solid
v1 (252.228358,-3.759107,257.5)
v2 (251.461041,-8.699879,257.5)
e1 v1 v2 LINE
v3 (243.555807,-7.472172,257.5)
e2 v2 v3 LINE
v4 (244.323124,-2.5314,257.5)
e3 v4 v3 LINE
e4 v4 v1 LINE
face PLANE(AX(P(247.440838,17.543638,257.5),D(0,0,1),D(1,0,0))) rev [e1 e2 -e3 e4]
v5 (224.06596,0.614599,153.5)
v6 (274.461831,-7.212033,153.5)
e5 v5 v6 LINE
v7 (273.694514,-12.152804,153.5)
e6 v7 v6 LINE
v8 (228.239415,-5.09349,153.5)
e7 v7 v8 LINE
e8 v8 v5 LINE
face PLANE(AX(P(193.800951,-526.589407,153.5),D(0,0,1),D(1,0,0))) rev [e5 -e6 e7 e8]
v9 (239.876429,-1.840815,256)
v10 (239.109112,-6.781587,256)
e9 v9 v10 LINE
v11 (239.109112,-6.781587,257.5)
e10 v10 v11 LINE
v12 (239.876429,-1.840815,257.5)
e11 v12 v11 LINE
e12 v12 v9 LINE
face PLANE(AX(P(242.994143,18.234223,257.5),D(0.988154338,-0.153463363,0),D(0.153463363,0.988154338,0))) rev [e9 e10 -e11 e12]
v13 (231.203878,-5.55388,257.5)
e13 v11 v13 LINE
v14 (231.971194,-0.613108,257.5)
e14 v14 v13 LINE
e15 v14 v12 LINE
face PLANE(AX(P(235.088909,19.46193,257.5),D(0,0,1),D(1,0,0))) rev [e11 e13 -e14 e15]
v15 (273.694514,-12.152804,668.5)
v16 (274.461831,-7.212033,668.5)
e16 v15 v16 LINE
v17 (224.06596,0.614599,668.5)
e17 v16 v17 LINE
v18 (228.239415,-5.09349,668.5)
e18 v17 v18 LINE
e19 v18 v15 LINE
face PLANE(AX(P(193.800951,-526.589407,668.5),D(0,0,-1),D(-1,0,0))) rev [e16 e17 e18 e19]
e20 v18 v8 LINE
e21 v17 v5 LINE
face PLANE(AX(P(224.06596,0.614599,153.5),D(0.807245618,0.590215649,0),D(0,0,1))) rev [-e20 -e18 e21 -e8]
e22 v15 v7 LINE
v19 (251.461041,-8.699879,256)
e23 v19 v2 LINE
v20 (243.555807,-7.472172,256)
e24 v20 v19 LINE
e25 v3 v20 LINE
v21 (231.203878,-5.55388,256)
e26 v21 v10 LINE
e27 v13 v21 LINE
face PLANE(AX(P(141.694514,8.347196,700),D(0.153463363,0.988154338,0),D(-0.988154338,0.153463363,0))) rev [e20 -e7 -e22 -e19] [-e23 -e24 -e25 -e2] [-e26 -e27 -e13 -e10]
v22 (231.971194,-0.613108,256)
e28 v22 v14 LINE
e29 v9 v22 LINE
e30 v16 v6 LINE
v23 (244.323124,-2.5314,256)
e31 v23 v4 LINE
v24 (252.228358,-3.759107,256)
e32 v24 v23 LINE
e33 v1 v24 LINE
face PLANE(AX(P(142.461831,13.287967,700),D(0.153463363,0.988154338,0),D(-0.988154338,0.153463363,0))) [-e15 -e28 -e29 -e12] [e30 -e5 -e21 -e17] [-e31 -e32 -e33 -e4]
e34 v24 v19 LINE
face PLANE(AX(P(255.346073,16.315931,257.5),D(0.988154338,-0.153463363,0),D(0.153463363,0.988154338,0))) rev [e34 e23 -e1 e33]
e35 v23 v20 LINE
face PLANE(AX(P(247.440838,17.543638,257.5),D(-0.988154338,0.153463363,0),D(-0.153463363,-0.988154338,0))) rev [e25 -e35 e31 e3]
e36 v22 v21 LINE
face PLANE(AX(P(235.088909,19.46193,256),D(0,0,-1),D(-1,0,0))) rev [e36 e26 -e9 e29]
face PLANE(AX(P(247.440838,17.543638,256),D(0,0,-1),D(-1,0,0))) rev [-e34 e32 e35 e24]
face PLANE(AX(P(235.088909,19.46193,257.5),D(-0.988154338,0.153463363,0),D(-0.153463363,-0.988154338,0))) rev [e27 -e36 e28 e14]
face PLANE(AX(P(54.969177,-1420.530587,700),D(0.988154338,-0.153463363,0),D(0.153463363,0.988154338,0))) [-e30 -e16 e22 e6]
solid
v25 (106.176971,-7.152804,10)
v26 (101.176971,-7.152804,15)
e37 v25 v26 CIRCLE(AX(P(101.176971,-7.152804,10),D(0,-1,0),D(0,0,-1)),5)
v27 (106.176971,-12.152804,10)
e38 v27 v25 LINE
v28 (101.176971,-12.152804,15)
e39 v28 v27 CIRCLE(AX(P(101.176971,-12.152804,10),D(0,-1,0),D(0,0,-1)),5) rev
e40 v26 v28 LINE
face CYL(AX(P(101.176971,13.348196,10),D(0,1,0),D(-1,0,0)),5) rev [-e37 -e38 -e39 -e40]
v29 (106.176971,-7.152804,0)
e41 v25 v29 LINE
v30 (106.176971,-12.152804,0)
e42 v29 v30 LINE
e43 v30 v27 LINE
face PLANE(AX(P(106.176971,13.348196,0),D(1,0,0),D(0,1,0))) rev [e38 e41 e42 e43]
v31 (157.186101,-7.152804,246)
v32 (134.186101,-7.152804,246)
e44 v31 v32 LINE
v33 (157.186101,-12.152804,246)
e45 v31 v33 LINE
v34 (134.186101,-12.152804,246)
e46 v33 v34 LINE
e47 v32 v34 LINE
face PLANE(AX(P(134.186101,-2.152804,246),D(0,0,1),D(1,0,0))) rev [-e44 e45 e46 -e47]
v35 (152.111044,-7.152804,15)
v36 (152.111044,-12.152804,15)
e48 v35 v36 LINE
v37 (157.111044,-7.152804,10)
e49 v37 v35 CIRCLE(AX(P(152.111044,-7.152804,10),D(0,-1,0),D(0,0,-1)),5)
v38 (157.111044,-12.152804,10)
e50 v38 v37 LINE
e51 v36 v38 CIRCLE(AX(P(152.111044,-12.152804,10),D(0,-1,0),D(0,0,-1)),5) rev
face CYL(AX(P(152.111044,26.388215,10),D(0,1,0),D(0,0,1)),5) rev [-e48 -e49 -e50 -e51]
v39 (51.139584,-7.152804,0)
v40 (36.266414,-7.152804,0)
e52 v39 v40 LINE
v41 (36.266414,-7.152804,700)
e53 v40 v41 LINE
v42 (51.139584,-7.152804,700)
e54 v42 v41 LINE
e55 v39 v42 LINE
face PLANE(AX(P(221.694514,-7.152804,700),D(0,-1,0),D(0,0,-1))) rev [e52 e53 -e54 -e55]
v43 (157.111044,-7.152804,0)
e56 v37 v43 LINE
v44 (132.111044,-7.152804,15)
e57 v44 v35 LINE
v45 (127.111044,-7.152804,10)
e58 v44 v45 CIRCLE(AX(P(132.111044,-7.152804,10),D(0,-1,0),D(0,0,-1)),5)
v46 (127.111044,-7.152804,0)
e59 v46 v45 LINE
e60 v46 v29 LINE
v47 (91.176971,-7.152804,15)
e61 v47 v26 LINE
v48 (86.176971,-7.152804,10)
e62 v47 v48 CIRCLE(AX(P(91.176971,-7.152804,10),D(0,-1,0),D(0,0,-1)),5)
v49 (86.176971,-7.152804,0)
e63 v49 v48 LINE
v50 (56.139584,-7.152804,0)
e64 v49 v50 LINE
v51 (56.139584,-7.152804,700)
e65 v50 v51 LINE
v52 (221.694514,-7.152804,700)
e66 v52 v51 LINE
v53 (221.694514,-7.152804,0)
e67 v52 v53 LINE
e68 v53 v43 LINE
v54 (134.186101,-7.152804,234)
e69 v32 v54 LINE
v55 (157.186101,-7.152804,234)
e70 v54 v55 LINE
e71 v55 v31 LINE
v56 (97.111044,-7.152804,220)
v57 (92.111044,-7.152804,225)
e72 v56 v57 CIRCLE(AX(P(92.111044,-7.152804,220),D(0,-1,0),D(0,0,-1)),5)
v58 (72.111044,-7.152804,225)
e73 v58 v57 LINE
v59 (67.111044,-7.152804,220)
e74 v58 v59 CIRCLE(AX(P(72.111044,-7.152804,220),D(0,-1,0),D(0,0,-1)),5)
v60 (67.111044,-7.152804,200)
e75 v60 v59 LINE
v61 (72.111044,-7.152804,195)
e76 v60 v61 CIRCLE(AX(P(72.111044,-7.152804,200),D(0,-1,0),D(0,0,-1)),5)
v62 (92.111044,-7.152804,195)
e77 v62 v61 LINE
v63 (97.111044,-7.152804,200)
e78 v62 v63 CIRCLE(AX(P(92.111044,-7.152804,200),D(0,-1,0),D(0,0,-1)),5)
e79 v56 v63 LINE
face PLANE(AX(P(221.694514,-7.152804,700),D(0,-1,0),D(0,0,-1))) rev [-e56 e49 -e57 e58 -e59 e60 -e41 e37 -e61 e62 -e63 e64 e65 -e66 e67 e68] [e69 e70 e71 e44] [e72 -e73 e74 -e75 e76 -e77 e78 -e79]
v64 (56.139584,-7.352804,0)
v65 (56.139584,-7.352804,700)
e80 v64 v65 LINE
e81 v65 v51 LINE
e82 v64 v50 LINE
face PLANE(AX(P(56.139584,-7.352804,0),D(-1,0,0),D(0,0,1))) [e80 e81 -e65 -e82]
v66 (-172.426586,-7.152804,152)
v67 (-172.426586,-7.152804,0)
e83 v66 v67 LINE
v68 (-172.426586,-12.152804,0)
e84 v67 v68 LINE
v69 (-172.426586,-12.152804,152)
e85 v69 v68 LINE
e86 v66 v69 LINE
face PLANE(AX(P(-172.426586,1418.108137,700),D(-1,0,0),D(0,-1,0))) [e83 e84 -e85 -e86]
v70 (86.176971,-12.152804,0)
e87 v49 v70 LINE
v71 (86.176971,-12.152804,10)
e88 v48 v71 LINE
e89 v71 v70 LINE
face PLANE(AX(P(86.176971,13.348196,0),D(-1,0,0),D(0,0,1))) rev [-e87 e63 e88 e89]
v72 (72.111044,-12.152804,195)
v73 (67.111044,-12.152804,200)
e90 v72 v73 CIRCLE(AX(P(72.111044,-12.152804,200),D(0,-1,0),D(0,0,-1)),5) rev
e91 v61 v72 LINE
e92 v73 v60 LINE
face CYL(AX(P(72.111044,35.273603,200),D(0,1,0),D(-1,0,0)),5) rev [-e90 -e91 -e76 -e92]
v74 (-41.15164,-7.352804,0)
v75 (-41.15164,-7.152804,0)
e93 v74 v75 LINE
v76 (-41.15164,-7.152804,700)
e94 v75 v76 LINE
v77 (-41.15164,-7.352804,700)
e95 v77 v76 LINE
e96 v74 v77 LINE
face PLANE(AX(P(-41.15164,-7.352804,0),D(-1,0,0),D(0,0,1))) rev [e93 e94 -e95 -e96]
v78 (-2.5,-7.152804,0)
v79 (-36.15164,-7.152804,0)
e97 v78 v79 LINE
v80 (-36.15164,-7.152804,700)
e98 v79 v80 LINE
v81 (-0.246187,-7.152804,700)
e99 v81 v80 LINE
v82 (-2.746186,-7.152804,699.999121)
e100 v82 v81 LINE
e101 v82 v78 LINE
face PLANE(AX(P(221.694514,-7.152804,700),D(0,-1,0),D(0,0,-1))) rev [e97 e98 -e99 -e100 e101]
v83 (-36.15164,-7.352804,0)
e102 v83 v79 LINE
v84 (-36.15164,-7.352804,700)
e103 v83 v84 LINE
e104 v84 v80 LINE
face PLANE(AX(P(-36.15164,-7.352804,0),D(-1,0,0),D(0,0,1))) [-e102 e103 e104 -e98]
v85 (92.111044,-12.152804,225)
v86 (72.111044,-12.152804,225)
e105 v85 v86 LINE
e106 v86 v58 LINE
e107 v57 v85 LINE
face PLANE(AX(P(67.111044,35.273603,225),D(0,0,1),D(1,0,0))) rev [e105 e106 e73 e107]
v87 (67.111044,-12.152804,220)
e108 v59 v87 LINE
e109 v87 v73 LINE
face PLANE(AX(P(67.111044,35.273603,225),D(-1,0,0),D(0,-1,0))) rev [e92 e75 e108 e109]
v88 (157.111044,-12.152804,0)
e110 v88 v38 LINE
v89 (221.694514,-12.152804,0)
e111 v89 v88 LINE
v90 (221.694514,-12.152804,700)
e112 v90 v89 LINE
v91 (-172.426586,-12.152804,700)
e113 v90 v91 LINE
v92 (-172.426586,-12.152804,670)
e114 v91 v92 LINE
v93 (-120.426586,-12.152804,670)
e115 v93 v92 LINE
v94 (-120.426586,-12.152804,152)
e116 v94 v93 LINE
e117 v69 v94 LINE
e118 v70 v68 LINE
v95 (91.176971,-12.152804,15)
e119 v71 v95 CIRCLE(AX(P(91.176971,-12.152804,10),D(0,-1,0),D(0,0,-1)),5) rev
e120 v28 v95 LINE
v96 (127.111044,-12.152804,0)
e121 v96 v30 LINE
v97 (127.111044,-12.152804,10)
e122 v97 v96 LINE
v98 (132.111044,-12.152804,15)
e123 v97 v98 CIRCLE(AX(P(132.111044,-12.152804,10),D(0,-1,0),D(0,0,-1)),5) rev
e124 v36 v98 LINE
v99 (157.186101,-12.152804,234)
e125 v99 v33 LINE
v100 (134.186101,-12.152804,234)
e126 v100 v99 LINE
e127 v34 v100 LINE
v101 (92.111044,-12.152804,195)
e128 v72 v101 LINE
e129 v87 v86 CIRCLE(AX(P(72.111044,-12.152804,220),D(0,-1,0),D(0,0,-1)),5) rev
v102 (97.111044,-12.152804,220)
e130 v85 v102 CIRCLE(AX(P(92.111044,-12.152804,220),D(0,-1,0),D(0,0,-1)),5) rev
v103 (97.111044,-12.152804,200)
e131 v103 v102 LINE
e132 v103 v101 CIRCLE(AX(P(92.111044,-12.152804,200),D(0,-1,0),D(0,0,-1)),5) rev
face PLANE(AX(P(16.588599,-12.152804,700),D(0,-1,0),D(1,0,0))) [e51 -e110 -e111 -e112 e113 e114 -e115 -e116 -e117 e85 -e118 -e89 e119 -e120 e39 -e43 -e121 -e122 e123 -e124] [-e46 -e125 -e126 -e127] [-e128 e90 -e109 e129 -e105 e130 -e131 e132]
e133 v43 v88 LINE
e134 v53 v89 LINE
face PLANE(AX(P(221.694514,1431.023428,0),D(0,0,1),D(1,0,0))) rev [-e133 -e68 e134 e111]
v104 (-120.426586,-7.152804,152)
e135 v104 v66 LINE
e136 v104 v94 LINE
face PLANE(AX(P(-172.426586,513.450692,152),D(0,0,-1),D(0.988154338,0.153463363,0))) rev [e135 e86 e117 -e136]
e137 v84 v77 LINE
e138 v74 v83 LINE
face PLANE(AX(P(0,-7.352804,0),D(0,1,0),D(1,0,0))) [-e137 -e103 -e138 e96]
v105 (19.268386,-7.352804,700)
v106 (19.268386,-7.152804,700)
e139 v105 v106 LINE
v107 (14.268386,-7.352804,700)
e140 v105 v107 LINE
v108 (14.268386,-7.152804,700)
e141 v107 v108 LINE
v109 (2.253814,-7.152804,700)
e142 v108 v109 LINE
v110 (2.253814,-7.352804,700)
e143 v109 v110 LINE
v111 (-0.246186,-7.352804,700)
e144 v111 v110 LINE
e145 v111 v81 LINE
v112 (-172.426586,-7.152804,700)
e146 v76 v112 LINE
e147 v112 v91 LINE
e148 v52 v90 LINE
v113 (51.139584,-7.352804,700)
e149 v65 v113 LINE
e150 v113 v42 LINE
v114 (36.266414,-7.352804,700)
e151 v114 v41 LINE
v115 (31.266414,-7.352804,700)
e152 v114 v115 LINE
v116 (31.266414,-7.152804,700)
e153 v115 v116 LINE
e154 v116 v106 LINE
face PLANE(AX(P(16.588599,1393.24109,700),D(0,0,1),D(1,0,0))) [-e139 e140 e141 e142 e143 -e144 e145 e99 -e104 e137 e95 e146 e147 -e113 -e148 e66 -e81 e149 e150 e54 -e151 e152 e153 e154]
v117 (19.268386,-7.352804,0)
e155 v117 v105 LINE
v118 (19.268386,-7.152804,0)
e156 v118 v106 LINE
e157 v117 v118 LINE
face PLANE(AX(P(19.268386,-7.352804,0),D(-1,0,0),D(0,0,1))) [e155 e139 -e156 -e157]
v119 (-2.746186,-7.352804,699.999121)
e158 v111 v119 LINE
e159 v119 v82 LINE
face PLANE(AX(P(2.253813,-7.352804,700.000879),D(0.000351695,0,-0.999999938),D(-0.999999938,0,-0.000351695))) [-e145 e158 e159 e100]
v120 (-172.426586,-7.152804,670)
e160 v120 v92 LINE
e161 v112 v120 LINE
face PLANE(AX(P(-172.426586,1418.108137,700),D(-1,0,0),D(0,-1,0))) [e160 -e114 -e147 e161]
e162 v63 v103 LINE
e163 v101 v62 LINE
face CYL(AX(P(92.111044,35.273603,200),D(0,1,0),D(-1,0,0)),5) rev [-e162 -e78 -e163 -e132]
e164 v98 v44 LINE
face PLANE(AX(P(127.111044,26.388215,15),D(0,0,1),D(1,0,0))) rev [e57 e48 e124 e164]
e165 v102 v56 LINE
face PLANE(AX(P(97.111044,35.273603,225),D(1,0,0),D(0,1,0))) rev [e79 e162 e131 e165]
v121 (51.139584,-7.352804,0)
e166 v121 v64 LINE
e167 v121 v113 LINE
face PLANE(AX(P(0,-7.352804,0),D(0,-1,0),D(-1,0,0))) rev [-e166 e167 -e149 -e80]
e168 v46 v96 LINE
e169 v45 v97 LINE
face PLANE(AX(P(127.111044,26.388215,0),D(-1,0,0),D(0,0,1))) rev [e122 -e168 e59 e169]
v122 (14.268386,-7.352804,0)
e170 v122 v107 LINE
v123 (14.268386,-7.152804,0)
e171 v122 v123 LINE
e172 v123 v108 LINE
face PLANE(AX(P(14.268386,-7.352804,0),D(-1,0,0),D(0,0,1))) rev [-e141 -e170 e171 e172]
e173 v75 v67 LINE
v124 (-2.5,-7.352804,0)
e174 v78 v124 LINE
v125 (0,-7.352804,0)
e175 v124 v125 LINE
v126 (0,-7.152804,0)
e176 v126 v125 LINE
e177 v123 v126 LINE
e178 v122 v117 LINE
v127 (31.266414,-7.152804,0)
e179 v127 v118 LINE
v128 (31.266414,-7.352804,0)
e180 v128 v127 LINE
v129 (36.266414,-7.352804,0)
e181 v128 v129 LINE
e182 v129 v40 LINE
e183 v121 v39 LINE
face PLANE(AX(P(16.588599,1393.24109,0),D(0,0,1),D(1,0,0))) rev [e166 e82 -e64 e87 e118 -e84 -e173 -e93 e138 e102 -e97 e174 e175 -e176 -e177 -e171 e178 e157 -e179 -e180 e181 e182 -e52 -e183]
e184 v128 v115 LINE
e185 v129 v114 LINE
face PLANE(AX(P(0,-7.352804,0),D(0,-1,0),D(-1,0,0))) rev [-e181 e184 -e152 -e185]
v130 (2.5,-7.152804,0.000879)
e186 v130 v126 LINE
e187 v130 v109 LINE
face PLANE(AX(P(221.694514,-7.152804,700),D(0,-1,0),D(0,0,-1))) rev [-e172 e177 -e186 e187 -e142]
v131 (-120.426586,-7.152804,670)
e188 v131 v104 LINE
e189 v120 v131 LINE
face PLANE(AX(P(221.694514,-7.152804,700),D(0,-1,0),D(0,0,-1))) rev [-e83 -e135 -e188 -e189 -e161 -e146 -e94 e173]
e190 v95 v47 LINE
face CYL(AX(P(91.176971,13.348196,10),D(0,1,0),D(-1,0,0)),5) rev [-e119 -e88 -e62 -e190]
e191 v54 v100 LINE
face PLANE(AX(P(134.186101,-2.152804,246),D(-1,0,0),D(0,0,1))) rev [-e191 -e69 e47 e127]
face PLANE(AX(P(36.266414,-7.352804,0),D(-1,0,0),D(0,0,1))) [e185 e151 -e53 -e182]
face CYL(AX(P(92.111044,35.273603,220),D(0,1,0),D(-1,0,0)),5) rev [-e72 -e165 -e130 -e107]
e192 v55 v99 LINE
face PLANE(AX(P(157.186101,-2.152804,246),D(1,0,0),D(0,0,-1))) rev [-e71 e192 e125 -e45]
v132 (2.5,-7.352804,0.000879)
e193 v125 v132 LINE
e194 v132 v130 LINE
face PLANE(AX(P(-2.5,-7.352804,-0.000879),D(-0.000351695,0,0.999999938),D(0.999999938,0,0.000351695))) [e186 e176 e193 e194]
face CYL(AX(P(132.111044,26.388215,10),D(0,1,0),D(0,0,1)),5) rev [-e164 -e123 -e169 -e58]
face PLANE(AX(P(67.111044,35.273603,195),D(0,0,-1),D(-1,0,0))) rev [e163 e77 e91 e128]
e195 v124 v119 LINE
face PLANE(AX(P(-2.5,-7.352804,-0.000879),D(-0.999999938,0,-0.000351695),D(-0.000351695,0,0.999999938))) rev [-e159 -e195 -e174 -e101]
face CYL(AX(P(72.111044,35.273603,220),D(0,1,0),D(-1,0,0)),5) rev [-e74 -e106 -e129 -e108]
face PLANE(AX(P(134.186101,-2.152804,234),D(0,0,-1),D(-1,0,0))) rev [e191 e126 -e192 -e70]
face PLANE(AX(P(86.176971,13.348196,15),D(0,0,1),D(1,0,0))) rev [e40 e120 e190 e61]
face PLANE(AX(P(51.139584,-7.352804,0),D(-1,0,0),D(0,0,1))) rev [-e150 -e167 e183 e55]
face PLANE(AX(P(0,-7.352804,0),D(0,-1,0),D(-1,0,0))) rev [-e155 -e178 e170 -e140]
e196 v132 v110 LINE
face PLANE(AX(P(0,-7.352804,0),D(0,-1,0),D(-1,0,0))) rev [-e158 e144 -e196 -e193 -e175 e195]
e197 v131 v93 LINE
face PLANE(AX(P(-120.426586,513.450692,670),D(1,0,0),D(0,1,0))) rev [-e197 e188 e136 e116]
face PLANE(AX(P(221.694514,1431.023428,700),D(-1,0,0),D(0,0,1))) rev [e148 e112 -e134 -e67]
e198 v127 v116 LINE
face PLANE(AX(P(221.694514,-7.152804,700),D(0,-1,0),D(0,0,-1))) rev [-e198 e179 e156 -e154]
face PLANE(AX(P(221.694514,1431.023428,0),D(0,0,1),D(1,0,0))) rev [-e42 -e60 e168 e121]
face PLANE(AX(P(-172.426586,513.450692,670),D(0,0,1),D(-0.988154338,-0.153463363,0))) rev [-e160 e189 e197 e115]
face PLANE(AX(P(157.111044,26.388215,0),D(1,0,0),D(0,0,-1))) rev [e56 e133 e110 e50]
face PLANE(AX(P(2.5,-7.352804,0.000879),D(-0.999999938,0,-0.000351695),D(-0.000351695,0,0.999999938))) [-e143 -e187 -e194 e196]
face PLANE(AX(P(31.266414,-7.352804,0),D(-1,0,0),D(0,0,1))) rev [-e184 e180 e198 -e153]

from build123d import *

# Parameters (mm, degrees)
TRAGFL_CHEGRUNDFORM_DEPTH                    = 700
ABWICKELN1_DEPTH                             = 700
ABWICKELN1_2_DEPTH                           = 700
ABBIEGEN1_DEPTH                              = 700
ABBIEGEN1_2_DEPTH                            = 700
QUERRUDER_DEPTH                              = 5
FASE1_SIZE                                   = 5
SKIZZE9_W                                    = 20
SKIZZE9_H                                    = 15
KABELDURCHBRUCHRUMPF_DEPTH                   = 5
VERRUNDUNG1_R                                = 5
SKIZZE10_W                                   = 30
SKIZZE10_H                                   = 30
KABELDURCHBRUCHMOTOR_DEPTH                   = 5
VERRUNDUNG2_R                                = 5
SKIZZE11_W                                   = 30
SKIZZE11_H                                   = 15
SCHNITT_LINEAR_AUSTRAGEN1_DEPTH              = 5
KABELDURCHBURCHSERVOS_R                      = 5
SKIZZE12_W                                   = 23
SKIZZE12_H                                   = 12
SERVODURCHBRUCH_DEPTH                        = 10
SKIZZE13_W                                   = 8
SKIZZE13_H                                   = 1.5
SCHNITT_LINEAR_AUSTRAGEN2_DEPTH              = 752.378951978
SCHNITT_LINEAR_AUSTRAGEN_D_NN2_DEPTH         = 700
SCHNITT_LINEAR_AUSTRAGEN_D_NN2_2_OUTLINE_W   = 52
SCHNITT_LINEAR_AUSTRAGEN_D_NN2_2_OUTLINE_H   = 5
SCHNITT_LINEAR_AUSTRAGEN_D_NN2_2_DEPTH       = 152
SCHNITT_LINEAR_AUSTRAGEN_D_NN2_START         = 670
SCHNITT_LINEAR_AUSTRAGEN_D_NN2_3_OUTLINE_W   = 52
SCHNITT_LINEAR_AUSTRAGEN_D_NN2_3_OUTLINE_H   = 5
SCHNITT_LINEAR_AUSTRAGEN_D_NN2_3_DEPTH       = 30
SCHNITT_LINEAR_AUSTRAGEN_D_NN2_4_DEPTH       = 700
SCHNITT_LINEAR_AUSTRAGEN_D_NN2_START_2       = -12.152804342
SCHNITT_LINEAR_AUSTRAGEN_D_NN2_5_OUTLINE_W   = 179.426586231
SCHNITT_LINEAR_AUSTRAGEN_D_NN2_5_OUTLINE_H   = 700
SCHNITT_LINEAR_AUSTRAGEN_D_NN2_5_DEPTH       = 4.8
SCHNITT_LINEAR_AUSTRAGEN_D_NN2_START_3       = -7.352804342
SCHNITT_LINEAR_AUSTRAGEN_D_NN2_6_OUTLINE_W   = 79.274946575
SCHNITT_LINEAR_AUSTRAGEN_D_NN2_6_OUTLINE_H   = 700
SCHNITT_LINEAR_AUSTRAGEN_D_NN2_6_OUTLINE_W_2 = 11.998027887
SCHNITT_LINEAR_AUSTRAGEN_D_NN2_6_OUTLINE_W_3 = 14.873170005
SCHNITT_LINEAR_AUSTRAGEN_D_NN2_6_DEPTH       = 0.2


with BuildPart() as part:
    # TragflächeGrundform: read off the stored shape, not the designer's step
    # TragflächeGrundform outline → TragflächeGrundform (new body)
    with BuildSketch(Plane.XY):
        Polygon((141.694514104, 8.347195658), (273.694514104, -12.152804342), (274.46183092, -7.212032651), (142.080458395, 13.347195658), (103.267684057, 13.347195658), (86.110620432, 10.396432289), (69.585407633, 5.027065166), (35.868015254, -12.152804342), (221.694514104, -12.152804342), (221.694514104, -7.152804342), (56.694514104, -7.152804342), (71.504741461, 0.393383409), (87.313114186, 5.529835073), (103.694514104, 8.347195658), align=None)
    extrude(amount=TRAGFL_CHEGRUNDFORM_DEPTH)

    # Abwickeln1: read off the stored shape, not the designer's step
    # Abwickeln1 outline → Abwickeln1 (cut)
    with BuildSketch(Plane.XY):
        Polygon((69.585407633, 5.027065166), (45.681067781, -7.152804342), (56.694514104, -7.152804342), (71.504741461, 0.393383409), (87.313114186, 5.529835073), (103.694514104, 8.347195658), (141.694514104, 8.347195658), (273.694514104, -12.152804342), (274.46183092, -7.212032651), (142.080458395, 13.347195658), (103.267684057, 13.347195658), (86.110620432, 10.396432289), align=None)
    extrude(amount=ABWICKELN1_DEPTH, mode=Mode.SUBTRACT)

    # Abwickeln1 2 outline → Abwickeln1 2 (add)
    with BuildSketch(Plane.XY):
        Polygon((45.681067781, -7.152804342), (-172.426586231, -7.152804342), (-172.426586231, -12.152804342), (35.868015254, -12.152804342), align=None)
    extrude(amount=ABWICKELN1_2_DEPTH)

    # Abbiegen1: read off the stored shape, not the designer's step
    # Abbiegen1 outline → Abbiegen1 (cut)
    with BuildSketch(Plane.XY):
        with BuildLine():
            ThreePointArc((57.111044081, -12.152804342), (53.540329867, -10.694232633), (52.012024567, -7.152804342))
            Line((52.012024567, -7.152804342), (-172.426586231, -7.152804342))
            Line((-172.426586231, -7.152804342), (-172.426586231, -12.152804342))
            Line((-172.426586231, -12.152804342), (57.111044081, -12.152804342))
        make_face()
    extrude(amount=ABBIEGEN1_DEPTH, mode=Mode.SUBTRACT)

    # Abbiegen1 2 outline → Abbiegen1 2 (add)
    with BuildSketch(Plane.XY):
        with BuildLine():
            Line((141.702141554, 8.346011092), (273.694514104, -12.152804342))
            Line((273.694514104, -12.152804342), (274.46183092, -7.212032651))
            Line((274.46183092, -7.212032651), (142.46945837, 13.286782783))
            ThreePointArc((142.46945837, 13.286782783), (142.079290863, 13.332070009), (141.686795218, 13.347195658))
            Line((141.686795218, 13.347195658), (103.703050705, 13.347195658))
            ThreePointArc((103.703050705, 13.347195658), (103.269261775, 13.328713853), (102.838616847, 13.273402389))
            Line((102.838616847, 13.273402389), (86.472730203, 10.45870986))
            ThreePointArc((86.472730203, 10.45870986), (86.113791213, 10.383599863), (85.76117739, 10.282891362))
            Line((85.76117739, 10.282891362), (69.967141466, 5.151098007))
            ThreePointArc((69.967141466, 5.151098007), (69.591442632, 5.01249539), (69.227776589, 4.844843047))
            Line((69.227776589, 4.844843047), (54.795692532, -2.508671069))
            ThreePointArc((54.795692532, -2.508671069), (52.736662064, -4.430823798), (52.012024567, -7.152804342))
            Line((52.012024567, -7.152804342), (57.111044081, -7.152804342))
            ThreePointArc((57.111044081, -7.152804342), (57.013807089, -7.076148878), (57.065645031, -6.963703689))
            Line((57.065645031, -6.963703689), (71.497729087, 0.389810426))
            ThreePointArc((71.497729087, 0.389810426), (71.504859794, 0.393097727), (71.512226438, 0.395815426))
            Line((71.512226438, 0.395815426), (87.306262362, 5.52760878))
            ThreePointArc((87.306262362, 5.52760878), (87.313176358, 5.529583457), (87.320214378, 5.531056202))
            Line((87.320214378, 5.531056202), (103.686101021, 8.345748731))
            ThreePointArc((103.686101021, 8.345748731), (103.694545039, 8.34683327), (103.703050705, 8.347195658))
            Line((103.703050705, 8.347195658), (141.686795218, 8.347195658))
            ThreePointArc((141.686795218, 8.347195658), (141.694491211, 8.346899077), (141.702141554, 8.346011092))
        make_face()
    extrude(amount=ABBIEGEN1_2_DEPTH)

    # Skizze8 → Querruder (cut)
    with BuildSketch(Plane(origin=(5.370179419, 34.578716257, 0), x_dir=(0.9881543382363094, -0.15346336313518455, 0), z_dir=(0.15346336313518455, 0.9881543382363094, 0))):
        Polygon((272.317431689, -670), (220.317431689, -670), (220.317431689, -418.5), (220.317431689, -358.002851525), (220.317431689, -152), (272.317431689, -152), (272.317431689, -153.5), (221.317431689, -153.5), (221.317431689, -668.5), (272.317431689, -668.5), align=None)
    extrude(amount=-QUERRUDER_DEPTH, mode=Mode.SUBTRACT)


with BuildPart() as querruder_piece_1:
    # of the separate pieces the step leaves, piece 1, a body of its own (querruder_pieces)
    add(part.part.solids().sort_by_distance((221.694514104, -12.152804342, 0))[0])

    # Skizze9 → KabeldurchbruchRumpf (cut)
    with BuildSketch(Plane.XZ.offset(12.152804342)):
        with Locations((96.176970849, 7.5)):
            Rectangle(SKIZZE9_W, SKIZZE9_H)
    extrude(amount=-KABELDURCHBRUCHRUMPF_DEPTH, mode=Mode.SUBTRACT)

    # Verrundung1
    verrundung1_edges = [querruder_piece_1.edges().sort_by_distance(p)[0] for p in [
        (86.176970849, -9.652804342, 15),
        (106.176970849, -9.652804342, 15),
    ]]
    fillet(verrundung1_edges, radius=VERRUNDUNG1_R)

    # Skizze10 → KabeldurchbruchMotor (cut)
    with BuildSketch(Plane.XZ.offset(12.152804342)):
        with Locations((82.111044081, 210)):
            Rectangle(SKIZZE10_W, SKIZZE10_H)
    extrude(amount=-KABELDURCHBRUCHMOTOR_DEPTH, mode=Mode.SUBTRACT)

    # Verrundung2
    verrundung2_edges = [querruder_piece_1.edges().sort_by_distance(p)[0] for p in [
        (67.111044081, -9.652804342, 195),
        (67.111044081, -9.652804342, 225),
        (97.111044081, -9.652804342, 225),
        (97.111044081, -9.652804342, 195),
    ]]
    fillet(verrundung2_edges, radius=VERRUNDUNG2_R)

    # Skizze11 → Schnitt-Linear austragen1 (cut)
    with BuildSketch(Plane.XZ.offset(12.152804342)):
        with Locations((142.111044081, 7.5)):
            Rectangle(SKIZZE11_W, SKIZZE11_H)
    extrude(amount=-SCHNITT_LINEAR_AUSTRAGEN1_DEPTH, mode=Mode.SUBTRACT)

    # KabeldurchburchServos
    kabeldurchburchservos_edges = [querruder_piece_1.edges().sort_by_distance(p)[0] for p in [
        (127.111044081, -9.652804342, 15),
        (157.111044081, -9.652804342, 15),
    ]]
    fillet(kabeldurchburchservos_edges, radius=KABELDURCHBURCHSERVOS_R)

    # Skizze12 → ServoDurchbruch (cut)
    with BuildSketch(Plane.XZ.offset(12.152804342)):
        with Locations((145.686101021, 240)):
            Rectangle(SKIZZE12_W, SKIZZE12_H)
    extrude(amount=-SERVODURCHBRUCH_DEPTH, mode=Mode.SUBTRACT)

    # Schnitt-Linear-Austragen-Dünn2: read off the stored shape, not the designer's step
    # Schnitt-Linear-Austragen-Dünn2 outline → Schnitt-Linear-Austragen-Dünn2 (cut)
    with BuildSketch(Plane.XY):
        Polygon((274.46183092, -7.212032651), (223.077805331, 0.768062232), (222.310488516, -4.172709459), (273.694514104, -12.152804342), align=None)
    extrude(amount=SCHNITT_LINEAR_AUSTRAGEN_D_NN2_DEPTH, mode=Mode.SUBTRACT)

    # Schnitt-Linear-Austragen-D_nn2 2 outline → Schnitt-Linear-Austragen-D_nn2 2 (add)
    with BuildSketch(Plane.XY):
        with Locations((-146.426586231, -9.652804342)):
            Rectangle(SCHNITT_LINEAR_AUSTRAGEN_D_NN2_2_OUTLINE_W, SCHNITT_LINEAR_AUSTRAGEN_D_NN2_2_OUTLINE_H)
    extrude(amount=SCHNITT_LINEAR_AUSTRAGEN_D_NN2_2_DEPTH)

    # Schnitt-Linear-Austragen-D_nn2 3 outline → Schnitt-Linear-Austragen-D_nn2 3 (add)
    with BuildSketch(Plane.XY.offset(SCHNITT_LINEAR_AUSTRAGEN_D_NN2_START)):
        with Locations((-146.426586231, -9.652804342)):
            Rectangle(SCHNITT_LINEAR_AUSTRAGEN_D_NN2_3_OUTLINE_W, SCHNITT_LINEAR_AUSTRAGEN_D_NN2_3_OUTLINE_H)
    extrude(amount=SCHNITT_LINEAR_AUSTRAGEN_D_NN2_3_DEPTH)

    # Schnitt-Linear-Austragen-D_nn2 4 outline → Schnitt-Linear-Austragen-D_nn2 4 (cut)
    with BuildSketch(Plane.XY):
        with BuildLine():
            ThreePointArc((54.795692532, -2.508671069), (52.686053369, -4.517166908), (52.019875256, -7.352804342))
            Line((52.019875256, -7.352804342), (56.139584199, -7.352804342))
            Line((56.139584199, -7.352804342), (56.139584199, -7.152804342))
            Line((56.139584199, -7.152804342), (57.111044081, -7.152804342))
            ThreePointArc((57.111044081, -7.152804342), (57.013807089, -7.076148878), (57.065645031, -6.963703689))
            Line((57.065645031, -6.963703689), (71.497729087, 0.389810426))
            ThreePointArc((71.497729087, 0.389810426), (71.504859794, 0.393097727), (71.512226438, 0.395815426))
            Line((71.512226438, 0.395815426), (87.306262362, 5.52760878))
            ThreePointArc((87.306262362, 5.52760878), (87.313176358, 5.529583457), (87.320214378, 5.531056202))
            Line((87.320214378, 5.531056202), (103.686101021, 8.345748731))
            ThreePointArc((103.686101021, 8.345748731), (103.694545039, 8.34683327), (103.703050705, 8.347195658))
            Line((103.703050705, 8.347195658), (141.686795218, 8.347195658))
            ThreePointArc((141.686795218, 8.347195658), (141.694491211, 8.346899077), (141.702141554, 8.346011092))
            Line((141.702141554, 8.346011092), (222.310488516, -4.172709459))
            Line((222.310488516, -4.172709459), (223.077805331, 0.768062232))
            Line((223.077805331, 0.768062232), (142.46945837, 13.286782783))
            ThreePointArc((142.46945837, 13.286782783), (142.079290863, 13.332070009), (141.686795218, 13.347195658))
            Line((141.686795218, 13.347195658), (103.703050705, 13.347195658))
            ThreePointArc((103.703050705, 13.347195658), (103.269261775, 13.328713853), (102.838616847, 13.273402389))
            Line((102.838616847, 13.273402389), (86.472730203, 10.45870986))
            ThreePointArc((86.472730203, 10.45870986), (86.113791213, 10.383599863), (85.76117739, 10.282891362))
            Line((85.76117739, 10.282891362), (69.967141466, 5.151098007))
            ThreePointArc((69.967141466, 5.151098007), (69.591442632, 5.01249539), (69.227776589, 4.844843047))
            Line((69.227776589, 4.844843047), (54.795692532, -2.508671069))
        make_face()
    extrude(amount=SCHNITT_LINEAR_AUSTRAGEN_D_NN2_4_DEPTH, mode=Mode.SUBTRACT)

    # Schnitt-Linear-Austragen-D_nn2 5 outline → Schnitt-Linear-Austragen-D_nn2 5 (add)
    with BuildSketch(Plane(origin=(0, 0, 0), x_dir=(1, 0, 0), z_dir=(0, 1, 0)).offset(SCHNITT_LINEAR_AUSTRAGEN_D_NN2_START_2)):
        with Locations((-30.713293115, -350)):
            Rectangle(SCHNITT_LINEAR_AUSTRAGEN_D_NN2_5_OUTLINE_W, SCHNITT_LINEAR_AUSTRAGEN_D_NN2_5_OUTLINE_H)
    extrude(amount=SCHNITT_LINEAR_AUSTRAGEN_D_NN2_5_DEPTH)

    # Schnitt-Linear-Austragen-D_nn2 6 outline → Schnitt-Linear-Austragen-D_nn2 6 (add)
    with BuildSketch(Plane(origin=(0, 0, 0), x_dir=(1, 0, 0), z_dir=(0, 1, 0)).offset(SCHNITT_LINEAR_AUSTRAGEN_D_NN2_START_3)):
        with Locations((-80.789112944, -350)):
            Rectangle(SCHNITT_LINEAR_AUSTRAGEN_D_NN2_6_OUTLINE_W, SCHNITT_LINEAR_AUSTRAGEN_D_NN2_6_OUTLINE_H)
        Polygon((-36.151639656, 0), (-36.151639656, -700), (-0.246186452, -700), (-2.746186296, -699.999120763), (-2.500000155, 0), align=None)
        Polygon((2.499999845, -0.000879237), (2.253813704, -700), (14.268386307, -700), (14.268386307, 0), (-1.26e-07, 0), align=None)
        with Locations((25.267400251, -350)):
            Rectangle(SCHNITT_LINEAR_AUSTRAGEN_D_NN2_6_OUTLINE_W_2, SCHNITT_LINEAR_AUSTRAGEN_D_NN2_6_OUTLINE_H)
        with Locations((43.702999197, -350)):
            Rectangle(SCHNITT_LINEAR_AUSTRAGEN_D_NN2_6_OUTLINE_W_3, SCHNITT_LINEAR_AUSTRAGEN_D_NN2_6_OUTLINE_H)
    extrude(amount=SCHNITT_LINEAR_AUSTRAGEN_D_NN2_6_DEPTH)


with BuildPart() as querruder_piece_2:
    # of the separate pieces the step leaves, piece 2, a body of its own (querruder_pieces)
    add(part.part.solids().sort_by_distance((273.694514104, -12.152804342, 153.5))[0])

    # Fase1
    fase1_edges = [querruder_piece_2.edges().sort_by_distance(p)[0] for p in [
        (223.298642854, -4.326172822, 411),
    ]]
    chamfer(fase1_edges, length=FASE1_SIZE - 0.0001)  # a hair under: the kernel refuses the full size

    # Skizze13 → Schnitt-Linear austragen2 (cut, through all)
    with BuildSketch(Plane(origin=(4.602862603, 29.637944565, 0), x_dir=(0.9881543382363094, -0.15346336313518452, 0), z_dir=(-0.15346336313518452, -0.9881543382363095, 0))):
        with Locations((233.317431689, 256.75)):
            Rectangle(SKIZZE13_W, SKIZZE13_H)
        with Locations((245.817431689, 256.75)):
            Rectangle(SKIZZE13_W, SKIZZE13_H)
    extrude(amount=-SCHNITT_LINEAR_AUSTRAGEN2_DEPTH, mode=Mode.SUBTRACT)


solid = Compound([querruder_piece_1.part, querruder_piece_2.part])
